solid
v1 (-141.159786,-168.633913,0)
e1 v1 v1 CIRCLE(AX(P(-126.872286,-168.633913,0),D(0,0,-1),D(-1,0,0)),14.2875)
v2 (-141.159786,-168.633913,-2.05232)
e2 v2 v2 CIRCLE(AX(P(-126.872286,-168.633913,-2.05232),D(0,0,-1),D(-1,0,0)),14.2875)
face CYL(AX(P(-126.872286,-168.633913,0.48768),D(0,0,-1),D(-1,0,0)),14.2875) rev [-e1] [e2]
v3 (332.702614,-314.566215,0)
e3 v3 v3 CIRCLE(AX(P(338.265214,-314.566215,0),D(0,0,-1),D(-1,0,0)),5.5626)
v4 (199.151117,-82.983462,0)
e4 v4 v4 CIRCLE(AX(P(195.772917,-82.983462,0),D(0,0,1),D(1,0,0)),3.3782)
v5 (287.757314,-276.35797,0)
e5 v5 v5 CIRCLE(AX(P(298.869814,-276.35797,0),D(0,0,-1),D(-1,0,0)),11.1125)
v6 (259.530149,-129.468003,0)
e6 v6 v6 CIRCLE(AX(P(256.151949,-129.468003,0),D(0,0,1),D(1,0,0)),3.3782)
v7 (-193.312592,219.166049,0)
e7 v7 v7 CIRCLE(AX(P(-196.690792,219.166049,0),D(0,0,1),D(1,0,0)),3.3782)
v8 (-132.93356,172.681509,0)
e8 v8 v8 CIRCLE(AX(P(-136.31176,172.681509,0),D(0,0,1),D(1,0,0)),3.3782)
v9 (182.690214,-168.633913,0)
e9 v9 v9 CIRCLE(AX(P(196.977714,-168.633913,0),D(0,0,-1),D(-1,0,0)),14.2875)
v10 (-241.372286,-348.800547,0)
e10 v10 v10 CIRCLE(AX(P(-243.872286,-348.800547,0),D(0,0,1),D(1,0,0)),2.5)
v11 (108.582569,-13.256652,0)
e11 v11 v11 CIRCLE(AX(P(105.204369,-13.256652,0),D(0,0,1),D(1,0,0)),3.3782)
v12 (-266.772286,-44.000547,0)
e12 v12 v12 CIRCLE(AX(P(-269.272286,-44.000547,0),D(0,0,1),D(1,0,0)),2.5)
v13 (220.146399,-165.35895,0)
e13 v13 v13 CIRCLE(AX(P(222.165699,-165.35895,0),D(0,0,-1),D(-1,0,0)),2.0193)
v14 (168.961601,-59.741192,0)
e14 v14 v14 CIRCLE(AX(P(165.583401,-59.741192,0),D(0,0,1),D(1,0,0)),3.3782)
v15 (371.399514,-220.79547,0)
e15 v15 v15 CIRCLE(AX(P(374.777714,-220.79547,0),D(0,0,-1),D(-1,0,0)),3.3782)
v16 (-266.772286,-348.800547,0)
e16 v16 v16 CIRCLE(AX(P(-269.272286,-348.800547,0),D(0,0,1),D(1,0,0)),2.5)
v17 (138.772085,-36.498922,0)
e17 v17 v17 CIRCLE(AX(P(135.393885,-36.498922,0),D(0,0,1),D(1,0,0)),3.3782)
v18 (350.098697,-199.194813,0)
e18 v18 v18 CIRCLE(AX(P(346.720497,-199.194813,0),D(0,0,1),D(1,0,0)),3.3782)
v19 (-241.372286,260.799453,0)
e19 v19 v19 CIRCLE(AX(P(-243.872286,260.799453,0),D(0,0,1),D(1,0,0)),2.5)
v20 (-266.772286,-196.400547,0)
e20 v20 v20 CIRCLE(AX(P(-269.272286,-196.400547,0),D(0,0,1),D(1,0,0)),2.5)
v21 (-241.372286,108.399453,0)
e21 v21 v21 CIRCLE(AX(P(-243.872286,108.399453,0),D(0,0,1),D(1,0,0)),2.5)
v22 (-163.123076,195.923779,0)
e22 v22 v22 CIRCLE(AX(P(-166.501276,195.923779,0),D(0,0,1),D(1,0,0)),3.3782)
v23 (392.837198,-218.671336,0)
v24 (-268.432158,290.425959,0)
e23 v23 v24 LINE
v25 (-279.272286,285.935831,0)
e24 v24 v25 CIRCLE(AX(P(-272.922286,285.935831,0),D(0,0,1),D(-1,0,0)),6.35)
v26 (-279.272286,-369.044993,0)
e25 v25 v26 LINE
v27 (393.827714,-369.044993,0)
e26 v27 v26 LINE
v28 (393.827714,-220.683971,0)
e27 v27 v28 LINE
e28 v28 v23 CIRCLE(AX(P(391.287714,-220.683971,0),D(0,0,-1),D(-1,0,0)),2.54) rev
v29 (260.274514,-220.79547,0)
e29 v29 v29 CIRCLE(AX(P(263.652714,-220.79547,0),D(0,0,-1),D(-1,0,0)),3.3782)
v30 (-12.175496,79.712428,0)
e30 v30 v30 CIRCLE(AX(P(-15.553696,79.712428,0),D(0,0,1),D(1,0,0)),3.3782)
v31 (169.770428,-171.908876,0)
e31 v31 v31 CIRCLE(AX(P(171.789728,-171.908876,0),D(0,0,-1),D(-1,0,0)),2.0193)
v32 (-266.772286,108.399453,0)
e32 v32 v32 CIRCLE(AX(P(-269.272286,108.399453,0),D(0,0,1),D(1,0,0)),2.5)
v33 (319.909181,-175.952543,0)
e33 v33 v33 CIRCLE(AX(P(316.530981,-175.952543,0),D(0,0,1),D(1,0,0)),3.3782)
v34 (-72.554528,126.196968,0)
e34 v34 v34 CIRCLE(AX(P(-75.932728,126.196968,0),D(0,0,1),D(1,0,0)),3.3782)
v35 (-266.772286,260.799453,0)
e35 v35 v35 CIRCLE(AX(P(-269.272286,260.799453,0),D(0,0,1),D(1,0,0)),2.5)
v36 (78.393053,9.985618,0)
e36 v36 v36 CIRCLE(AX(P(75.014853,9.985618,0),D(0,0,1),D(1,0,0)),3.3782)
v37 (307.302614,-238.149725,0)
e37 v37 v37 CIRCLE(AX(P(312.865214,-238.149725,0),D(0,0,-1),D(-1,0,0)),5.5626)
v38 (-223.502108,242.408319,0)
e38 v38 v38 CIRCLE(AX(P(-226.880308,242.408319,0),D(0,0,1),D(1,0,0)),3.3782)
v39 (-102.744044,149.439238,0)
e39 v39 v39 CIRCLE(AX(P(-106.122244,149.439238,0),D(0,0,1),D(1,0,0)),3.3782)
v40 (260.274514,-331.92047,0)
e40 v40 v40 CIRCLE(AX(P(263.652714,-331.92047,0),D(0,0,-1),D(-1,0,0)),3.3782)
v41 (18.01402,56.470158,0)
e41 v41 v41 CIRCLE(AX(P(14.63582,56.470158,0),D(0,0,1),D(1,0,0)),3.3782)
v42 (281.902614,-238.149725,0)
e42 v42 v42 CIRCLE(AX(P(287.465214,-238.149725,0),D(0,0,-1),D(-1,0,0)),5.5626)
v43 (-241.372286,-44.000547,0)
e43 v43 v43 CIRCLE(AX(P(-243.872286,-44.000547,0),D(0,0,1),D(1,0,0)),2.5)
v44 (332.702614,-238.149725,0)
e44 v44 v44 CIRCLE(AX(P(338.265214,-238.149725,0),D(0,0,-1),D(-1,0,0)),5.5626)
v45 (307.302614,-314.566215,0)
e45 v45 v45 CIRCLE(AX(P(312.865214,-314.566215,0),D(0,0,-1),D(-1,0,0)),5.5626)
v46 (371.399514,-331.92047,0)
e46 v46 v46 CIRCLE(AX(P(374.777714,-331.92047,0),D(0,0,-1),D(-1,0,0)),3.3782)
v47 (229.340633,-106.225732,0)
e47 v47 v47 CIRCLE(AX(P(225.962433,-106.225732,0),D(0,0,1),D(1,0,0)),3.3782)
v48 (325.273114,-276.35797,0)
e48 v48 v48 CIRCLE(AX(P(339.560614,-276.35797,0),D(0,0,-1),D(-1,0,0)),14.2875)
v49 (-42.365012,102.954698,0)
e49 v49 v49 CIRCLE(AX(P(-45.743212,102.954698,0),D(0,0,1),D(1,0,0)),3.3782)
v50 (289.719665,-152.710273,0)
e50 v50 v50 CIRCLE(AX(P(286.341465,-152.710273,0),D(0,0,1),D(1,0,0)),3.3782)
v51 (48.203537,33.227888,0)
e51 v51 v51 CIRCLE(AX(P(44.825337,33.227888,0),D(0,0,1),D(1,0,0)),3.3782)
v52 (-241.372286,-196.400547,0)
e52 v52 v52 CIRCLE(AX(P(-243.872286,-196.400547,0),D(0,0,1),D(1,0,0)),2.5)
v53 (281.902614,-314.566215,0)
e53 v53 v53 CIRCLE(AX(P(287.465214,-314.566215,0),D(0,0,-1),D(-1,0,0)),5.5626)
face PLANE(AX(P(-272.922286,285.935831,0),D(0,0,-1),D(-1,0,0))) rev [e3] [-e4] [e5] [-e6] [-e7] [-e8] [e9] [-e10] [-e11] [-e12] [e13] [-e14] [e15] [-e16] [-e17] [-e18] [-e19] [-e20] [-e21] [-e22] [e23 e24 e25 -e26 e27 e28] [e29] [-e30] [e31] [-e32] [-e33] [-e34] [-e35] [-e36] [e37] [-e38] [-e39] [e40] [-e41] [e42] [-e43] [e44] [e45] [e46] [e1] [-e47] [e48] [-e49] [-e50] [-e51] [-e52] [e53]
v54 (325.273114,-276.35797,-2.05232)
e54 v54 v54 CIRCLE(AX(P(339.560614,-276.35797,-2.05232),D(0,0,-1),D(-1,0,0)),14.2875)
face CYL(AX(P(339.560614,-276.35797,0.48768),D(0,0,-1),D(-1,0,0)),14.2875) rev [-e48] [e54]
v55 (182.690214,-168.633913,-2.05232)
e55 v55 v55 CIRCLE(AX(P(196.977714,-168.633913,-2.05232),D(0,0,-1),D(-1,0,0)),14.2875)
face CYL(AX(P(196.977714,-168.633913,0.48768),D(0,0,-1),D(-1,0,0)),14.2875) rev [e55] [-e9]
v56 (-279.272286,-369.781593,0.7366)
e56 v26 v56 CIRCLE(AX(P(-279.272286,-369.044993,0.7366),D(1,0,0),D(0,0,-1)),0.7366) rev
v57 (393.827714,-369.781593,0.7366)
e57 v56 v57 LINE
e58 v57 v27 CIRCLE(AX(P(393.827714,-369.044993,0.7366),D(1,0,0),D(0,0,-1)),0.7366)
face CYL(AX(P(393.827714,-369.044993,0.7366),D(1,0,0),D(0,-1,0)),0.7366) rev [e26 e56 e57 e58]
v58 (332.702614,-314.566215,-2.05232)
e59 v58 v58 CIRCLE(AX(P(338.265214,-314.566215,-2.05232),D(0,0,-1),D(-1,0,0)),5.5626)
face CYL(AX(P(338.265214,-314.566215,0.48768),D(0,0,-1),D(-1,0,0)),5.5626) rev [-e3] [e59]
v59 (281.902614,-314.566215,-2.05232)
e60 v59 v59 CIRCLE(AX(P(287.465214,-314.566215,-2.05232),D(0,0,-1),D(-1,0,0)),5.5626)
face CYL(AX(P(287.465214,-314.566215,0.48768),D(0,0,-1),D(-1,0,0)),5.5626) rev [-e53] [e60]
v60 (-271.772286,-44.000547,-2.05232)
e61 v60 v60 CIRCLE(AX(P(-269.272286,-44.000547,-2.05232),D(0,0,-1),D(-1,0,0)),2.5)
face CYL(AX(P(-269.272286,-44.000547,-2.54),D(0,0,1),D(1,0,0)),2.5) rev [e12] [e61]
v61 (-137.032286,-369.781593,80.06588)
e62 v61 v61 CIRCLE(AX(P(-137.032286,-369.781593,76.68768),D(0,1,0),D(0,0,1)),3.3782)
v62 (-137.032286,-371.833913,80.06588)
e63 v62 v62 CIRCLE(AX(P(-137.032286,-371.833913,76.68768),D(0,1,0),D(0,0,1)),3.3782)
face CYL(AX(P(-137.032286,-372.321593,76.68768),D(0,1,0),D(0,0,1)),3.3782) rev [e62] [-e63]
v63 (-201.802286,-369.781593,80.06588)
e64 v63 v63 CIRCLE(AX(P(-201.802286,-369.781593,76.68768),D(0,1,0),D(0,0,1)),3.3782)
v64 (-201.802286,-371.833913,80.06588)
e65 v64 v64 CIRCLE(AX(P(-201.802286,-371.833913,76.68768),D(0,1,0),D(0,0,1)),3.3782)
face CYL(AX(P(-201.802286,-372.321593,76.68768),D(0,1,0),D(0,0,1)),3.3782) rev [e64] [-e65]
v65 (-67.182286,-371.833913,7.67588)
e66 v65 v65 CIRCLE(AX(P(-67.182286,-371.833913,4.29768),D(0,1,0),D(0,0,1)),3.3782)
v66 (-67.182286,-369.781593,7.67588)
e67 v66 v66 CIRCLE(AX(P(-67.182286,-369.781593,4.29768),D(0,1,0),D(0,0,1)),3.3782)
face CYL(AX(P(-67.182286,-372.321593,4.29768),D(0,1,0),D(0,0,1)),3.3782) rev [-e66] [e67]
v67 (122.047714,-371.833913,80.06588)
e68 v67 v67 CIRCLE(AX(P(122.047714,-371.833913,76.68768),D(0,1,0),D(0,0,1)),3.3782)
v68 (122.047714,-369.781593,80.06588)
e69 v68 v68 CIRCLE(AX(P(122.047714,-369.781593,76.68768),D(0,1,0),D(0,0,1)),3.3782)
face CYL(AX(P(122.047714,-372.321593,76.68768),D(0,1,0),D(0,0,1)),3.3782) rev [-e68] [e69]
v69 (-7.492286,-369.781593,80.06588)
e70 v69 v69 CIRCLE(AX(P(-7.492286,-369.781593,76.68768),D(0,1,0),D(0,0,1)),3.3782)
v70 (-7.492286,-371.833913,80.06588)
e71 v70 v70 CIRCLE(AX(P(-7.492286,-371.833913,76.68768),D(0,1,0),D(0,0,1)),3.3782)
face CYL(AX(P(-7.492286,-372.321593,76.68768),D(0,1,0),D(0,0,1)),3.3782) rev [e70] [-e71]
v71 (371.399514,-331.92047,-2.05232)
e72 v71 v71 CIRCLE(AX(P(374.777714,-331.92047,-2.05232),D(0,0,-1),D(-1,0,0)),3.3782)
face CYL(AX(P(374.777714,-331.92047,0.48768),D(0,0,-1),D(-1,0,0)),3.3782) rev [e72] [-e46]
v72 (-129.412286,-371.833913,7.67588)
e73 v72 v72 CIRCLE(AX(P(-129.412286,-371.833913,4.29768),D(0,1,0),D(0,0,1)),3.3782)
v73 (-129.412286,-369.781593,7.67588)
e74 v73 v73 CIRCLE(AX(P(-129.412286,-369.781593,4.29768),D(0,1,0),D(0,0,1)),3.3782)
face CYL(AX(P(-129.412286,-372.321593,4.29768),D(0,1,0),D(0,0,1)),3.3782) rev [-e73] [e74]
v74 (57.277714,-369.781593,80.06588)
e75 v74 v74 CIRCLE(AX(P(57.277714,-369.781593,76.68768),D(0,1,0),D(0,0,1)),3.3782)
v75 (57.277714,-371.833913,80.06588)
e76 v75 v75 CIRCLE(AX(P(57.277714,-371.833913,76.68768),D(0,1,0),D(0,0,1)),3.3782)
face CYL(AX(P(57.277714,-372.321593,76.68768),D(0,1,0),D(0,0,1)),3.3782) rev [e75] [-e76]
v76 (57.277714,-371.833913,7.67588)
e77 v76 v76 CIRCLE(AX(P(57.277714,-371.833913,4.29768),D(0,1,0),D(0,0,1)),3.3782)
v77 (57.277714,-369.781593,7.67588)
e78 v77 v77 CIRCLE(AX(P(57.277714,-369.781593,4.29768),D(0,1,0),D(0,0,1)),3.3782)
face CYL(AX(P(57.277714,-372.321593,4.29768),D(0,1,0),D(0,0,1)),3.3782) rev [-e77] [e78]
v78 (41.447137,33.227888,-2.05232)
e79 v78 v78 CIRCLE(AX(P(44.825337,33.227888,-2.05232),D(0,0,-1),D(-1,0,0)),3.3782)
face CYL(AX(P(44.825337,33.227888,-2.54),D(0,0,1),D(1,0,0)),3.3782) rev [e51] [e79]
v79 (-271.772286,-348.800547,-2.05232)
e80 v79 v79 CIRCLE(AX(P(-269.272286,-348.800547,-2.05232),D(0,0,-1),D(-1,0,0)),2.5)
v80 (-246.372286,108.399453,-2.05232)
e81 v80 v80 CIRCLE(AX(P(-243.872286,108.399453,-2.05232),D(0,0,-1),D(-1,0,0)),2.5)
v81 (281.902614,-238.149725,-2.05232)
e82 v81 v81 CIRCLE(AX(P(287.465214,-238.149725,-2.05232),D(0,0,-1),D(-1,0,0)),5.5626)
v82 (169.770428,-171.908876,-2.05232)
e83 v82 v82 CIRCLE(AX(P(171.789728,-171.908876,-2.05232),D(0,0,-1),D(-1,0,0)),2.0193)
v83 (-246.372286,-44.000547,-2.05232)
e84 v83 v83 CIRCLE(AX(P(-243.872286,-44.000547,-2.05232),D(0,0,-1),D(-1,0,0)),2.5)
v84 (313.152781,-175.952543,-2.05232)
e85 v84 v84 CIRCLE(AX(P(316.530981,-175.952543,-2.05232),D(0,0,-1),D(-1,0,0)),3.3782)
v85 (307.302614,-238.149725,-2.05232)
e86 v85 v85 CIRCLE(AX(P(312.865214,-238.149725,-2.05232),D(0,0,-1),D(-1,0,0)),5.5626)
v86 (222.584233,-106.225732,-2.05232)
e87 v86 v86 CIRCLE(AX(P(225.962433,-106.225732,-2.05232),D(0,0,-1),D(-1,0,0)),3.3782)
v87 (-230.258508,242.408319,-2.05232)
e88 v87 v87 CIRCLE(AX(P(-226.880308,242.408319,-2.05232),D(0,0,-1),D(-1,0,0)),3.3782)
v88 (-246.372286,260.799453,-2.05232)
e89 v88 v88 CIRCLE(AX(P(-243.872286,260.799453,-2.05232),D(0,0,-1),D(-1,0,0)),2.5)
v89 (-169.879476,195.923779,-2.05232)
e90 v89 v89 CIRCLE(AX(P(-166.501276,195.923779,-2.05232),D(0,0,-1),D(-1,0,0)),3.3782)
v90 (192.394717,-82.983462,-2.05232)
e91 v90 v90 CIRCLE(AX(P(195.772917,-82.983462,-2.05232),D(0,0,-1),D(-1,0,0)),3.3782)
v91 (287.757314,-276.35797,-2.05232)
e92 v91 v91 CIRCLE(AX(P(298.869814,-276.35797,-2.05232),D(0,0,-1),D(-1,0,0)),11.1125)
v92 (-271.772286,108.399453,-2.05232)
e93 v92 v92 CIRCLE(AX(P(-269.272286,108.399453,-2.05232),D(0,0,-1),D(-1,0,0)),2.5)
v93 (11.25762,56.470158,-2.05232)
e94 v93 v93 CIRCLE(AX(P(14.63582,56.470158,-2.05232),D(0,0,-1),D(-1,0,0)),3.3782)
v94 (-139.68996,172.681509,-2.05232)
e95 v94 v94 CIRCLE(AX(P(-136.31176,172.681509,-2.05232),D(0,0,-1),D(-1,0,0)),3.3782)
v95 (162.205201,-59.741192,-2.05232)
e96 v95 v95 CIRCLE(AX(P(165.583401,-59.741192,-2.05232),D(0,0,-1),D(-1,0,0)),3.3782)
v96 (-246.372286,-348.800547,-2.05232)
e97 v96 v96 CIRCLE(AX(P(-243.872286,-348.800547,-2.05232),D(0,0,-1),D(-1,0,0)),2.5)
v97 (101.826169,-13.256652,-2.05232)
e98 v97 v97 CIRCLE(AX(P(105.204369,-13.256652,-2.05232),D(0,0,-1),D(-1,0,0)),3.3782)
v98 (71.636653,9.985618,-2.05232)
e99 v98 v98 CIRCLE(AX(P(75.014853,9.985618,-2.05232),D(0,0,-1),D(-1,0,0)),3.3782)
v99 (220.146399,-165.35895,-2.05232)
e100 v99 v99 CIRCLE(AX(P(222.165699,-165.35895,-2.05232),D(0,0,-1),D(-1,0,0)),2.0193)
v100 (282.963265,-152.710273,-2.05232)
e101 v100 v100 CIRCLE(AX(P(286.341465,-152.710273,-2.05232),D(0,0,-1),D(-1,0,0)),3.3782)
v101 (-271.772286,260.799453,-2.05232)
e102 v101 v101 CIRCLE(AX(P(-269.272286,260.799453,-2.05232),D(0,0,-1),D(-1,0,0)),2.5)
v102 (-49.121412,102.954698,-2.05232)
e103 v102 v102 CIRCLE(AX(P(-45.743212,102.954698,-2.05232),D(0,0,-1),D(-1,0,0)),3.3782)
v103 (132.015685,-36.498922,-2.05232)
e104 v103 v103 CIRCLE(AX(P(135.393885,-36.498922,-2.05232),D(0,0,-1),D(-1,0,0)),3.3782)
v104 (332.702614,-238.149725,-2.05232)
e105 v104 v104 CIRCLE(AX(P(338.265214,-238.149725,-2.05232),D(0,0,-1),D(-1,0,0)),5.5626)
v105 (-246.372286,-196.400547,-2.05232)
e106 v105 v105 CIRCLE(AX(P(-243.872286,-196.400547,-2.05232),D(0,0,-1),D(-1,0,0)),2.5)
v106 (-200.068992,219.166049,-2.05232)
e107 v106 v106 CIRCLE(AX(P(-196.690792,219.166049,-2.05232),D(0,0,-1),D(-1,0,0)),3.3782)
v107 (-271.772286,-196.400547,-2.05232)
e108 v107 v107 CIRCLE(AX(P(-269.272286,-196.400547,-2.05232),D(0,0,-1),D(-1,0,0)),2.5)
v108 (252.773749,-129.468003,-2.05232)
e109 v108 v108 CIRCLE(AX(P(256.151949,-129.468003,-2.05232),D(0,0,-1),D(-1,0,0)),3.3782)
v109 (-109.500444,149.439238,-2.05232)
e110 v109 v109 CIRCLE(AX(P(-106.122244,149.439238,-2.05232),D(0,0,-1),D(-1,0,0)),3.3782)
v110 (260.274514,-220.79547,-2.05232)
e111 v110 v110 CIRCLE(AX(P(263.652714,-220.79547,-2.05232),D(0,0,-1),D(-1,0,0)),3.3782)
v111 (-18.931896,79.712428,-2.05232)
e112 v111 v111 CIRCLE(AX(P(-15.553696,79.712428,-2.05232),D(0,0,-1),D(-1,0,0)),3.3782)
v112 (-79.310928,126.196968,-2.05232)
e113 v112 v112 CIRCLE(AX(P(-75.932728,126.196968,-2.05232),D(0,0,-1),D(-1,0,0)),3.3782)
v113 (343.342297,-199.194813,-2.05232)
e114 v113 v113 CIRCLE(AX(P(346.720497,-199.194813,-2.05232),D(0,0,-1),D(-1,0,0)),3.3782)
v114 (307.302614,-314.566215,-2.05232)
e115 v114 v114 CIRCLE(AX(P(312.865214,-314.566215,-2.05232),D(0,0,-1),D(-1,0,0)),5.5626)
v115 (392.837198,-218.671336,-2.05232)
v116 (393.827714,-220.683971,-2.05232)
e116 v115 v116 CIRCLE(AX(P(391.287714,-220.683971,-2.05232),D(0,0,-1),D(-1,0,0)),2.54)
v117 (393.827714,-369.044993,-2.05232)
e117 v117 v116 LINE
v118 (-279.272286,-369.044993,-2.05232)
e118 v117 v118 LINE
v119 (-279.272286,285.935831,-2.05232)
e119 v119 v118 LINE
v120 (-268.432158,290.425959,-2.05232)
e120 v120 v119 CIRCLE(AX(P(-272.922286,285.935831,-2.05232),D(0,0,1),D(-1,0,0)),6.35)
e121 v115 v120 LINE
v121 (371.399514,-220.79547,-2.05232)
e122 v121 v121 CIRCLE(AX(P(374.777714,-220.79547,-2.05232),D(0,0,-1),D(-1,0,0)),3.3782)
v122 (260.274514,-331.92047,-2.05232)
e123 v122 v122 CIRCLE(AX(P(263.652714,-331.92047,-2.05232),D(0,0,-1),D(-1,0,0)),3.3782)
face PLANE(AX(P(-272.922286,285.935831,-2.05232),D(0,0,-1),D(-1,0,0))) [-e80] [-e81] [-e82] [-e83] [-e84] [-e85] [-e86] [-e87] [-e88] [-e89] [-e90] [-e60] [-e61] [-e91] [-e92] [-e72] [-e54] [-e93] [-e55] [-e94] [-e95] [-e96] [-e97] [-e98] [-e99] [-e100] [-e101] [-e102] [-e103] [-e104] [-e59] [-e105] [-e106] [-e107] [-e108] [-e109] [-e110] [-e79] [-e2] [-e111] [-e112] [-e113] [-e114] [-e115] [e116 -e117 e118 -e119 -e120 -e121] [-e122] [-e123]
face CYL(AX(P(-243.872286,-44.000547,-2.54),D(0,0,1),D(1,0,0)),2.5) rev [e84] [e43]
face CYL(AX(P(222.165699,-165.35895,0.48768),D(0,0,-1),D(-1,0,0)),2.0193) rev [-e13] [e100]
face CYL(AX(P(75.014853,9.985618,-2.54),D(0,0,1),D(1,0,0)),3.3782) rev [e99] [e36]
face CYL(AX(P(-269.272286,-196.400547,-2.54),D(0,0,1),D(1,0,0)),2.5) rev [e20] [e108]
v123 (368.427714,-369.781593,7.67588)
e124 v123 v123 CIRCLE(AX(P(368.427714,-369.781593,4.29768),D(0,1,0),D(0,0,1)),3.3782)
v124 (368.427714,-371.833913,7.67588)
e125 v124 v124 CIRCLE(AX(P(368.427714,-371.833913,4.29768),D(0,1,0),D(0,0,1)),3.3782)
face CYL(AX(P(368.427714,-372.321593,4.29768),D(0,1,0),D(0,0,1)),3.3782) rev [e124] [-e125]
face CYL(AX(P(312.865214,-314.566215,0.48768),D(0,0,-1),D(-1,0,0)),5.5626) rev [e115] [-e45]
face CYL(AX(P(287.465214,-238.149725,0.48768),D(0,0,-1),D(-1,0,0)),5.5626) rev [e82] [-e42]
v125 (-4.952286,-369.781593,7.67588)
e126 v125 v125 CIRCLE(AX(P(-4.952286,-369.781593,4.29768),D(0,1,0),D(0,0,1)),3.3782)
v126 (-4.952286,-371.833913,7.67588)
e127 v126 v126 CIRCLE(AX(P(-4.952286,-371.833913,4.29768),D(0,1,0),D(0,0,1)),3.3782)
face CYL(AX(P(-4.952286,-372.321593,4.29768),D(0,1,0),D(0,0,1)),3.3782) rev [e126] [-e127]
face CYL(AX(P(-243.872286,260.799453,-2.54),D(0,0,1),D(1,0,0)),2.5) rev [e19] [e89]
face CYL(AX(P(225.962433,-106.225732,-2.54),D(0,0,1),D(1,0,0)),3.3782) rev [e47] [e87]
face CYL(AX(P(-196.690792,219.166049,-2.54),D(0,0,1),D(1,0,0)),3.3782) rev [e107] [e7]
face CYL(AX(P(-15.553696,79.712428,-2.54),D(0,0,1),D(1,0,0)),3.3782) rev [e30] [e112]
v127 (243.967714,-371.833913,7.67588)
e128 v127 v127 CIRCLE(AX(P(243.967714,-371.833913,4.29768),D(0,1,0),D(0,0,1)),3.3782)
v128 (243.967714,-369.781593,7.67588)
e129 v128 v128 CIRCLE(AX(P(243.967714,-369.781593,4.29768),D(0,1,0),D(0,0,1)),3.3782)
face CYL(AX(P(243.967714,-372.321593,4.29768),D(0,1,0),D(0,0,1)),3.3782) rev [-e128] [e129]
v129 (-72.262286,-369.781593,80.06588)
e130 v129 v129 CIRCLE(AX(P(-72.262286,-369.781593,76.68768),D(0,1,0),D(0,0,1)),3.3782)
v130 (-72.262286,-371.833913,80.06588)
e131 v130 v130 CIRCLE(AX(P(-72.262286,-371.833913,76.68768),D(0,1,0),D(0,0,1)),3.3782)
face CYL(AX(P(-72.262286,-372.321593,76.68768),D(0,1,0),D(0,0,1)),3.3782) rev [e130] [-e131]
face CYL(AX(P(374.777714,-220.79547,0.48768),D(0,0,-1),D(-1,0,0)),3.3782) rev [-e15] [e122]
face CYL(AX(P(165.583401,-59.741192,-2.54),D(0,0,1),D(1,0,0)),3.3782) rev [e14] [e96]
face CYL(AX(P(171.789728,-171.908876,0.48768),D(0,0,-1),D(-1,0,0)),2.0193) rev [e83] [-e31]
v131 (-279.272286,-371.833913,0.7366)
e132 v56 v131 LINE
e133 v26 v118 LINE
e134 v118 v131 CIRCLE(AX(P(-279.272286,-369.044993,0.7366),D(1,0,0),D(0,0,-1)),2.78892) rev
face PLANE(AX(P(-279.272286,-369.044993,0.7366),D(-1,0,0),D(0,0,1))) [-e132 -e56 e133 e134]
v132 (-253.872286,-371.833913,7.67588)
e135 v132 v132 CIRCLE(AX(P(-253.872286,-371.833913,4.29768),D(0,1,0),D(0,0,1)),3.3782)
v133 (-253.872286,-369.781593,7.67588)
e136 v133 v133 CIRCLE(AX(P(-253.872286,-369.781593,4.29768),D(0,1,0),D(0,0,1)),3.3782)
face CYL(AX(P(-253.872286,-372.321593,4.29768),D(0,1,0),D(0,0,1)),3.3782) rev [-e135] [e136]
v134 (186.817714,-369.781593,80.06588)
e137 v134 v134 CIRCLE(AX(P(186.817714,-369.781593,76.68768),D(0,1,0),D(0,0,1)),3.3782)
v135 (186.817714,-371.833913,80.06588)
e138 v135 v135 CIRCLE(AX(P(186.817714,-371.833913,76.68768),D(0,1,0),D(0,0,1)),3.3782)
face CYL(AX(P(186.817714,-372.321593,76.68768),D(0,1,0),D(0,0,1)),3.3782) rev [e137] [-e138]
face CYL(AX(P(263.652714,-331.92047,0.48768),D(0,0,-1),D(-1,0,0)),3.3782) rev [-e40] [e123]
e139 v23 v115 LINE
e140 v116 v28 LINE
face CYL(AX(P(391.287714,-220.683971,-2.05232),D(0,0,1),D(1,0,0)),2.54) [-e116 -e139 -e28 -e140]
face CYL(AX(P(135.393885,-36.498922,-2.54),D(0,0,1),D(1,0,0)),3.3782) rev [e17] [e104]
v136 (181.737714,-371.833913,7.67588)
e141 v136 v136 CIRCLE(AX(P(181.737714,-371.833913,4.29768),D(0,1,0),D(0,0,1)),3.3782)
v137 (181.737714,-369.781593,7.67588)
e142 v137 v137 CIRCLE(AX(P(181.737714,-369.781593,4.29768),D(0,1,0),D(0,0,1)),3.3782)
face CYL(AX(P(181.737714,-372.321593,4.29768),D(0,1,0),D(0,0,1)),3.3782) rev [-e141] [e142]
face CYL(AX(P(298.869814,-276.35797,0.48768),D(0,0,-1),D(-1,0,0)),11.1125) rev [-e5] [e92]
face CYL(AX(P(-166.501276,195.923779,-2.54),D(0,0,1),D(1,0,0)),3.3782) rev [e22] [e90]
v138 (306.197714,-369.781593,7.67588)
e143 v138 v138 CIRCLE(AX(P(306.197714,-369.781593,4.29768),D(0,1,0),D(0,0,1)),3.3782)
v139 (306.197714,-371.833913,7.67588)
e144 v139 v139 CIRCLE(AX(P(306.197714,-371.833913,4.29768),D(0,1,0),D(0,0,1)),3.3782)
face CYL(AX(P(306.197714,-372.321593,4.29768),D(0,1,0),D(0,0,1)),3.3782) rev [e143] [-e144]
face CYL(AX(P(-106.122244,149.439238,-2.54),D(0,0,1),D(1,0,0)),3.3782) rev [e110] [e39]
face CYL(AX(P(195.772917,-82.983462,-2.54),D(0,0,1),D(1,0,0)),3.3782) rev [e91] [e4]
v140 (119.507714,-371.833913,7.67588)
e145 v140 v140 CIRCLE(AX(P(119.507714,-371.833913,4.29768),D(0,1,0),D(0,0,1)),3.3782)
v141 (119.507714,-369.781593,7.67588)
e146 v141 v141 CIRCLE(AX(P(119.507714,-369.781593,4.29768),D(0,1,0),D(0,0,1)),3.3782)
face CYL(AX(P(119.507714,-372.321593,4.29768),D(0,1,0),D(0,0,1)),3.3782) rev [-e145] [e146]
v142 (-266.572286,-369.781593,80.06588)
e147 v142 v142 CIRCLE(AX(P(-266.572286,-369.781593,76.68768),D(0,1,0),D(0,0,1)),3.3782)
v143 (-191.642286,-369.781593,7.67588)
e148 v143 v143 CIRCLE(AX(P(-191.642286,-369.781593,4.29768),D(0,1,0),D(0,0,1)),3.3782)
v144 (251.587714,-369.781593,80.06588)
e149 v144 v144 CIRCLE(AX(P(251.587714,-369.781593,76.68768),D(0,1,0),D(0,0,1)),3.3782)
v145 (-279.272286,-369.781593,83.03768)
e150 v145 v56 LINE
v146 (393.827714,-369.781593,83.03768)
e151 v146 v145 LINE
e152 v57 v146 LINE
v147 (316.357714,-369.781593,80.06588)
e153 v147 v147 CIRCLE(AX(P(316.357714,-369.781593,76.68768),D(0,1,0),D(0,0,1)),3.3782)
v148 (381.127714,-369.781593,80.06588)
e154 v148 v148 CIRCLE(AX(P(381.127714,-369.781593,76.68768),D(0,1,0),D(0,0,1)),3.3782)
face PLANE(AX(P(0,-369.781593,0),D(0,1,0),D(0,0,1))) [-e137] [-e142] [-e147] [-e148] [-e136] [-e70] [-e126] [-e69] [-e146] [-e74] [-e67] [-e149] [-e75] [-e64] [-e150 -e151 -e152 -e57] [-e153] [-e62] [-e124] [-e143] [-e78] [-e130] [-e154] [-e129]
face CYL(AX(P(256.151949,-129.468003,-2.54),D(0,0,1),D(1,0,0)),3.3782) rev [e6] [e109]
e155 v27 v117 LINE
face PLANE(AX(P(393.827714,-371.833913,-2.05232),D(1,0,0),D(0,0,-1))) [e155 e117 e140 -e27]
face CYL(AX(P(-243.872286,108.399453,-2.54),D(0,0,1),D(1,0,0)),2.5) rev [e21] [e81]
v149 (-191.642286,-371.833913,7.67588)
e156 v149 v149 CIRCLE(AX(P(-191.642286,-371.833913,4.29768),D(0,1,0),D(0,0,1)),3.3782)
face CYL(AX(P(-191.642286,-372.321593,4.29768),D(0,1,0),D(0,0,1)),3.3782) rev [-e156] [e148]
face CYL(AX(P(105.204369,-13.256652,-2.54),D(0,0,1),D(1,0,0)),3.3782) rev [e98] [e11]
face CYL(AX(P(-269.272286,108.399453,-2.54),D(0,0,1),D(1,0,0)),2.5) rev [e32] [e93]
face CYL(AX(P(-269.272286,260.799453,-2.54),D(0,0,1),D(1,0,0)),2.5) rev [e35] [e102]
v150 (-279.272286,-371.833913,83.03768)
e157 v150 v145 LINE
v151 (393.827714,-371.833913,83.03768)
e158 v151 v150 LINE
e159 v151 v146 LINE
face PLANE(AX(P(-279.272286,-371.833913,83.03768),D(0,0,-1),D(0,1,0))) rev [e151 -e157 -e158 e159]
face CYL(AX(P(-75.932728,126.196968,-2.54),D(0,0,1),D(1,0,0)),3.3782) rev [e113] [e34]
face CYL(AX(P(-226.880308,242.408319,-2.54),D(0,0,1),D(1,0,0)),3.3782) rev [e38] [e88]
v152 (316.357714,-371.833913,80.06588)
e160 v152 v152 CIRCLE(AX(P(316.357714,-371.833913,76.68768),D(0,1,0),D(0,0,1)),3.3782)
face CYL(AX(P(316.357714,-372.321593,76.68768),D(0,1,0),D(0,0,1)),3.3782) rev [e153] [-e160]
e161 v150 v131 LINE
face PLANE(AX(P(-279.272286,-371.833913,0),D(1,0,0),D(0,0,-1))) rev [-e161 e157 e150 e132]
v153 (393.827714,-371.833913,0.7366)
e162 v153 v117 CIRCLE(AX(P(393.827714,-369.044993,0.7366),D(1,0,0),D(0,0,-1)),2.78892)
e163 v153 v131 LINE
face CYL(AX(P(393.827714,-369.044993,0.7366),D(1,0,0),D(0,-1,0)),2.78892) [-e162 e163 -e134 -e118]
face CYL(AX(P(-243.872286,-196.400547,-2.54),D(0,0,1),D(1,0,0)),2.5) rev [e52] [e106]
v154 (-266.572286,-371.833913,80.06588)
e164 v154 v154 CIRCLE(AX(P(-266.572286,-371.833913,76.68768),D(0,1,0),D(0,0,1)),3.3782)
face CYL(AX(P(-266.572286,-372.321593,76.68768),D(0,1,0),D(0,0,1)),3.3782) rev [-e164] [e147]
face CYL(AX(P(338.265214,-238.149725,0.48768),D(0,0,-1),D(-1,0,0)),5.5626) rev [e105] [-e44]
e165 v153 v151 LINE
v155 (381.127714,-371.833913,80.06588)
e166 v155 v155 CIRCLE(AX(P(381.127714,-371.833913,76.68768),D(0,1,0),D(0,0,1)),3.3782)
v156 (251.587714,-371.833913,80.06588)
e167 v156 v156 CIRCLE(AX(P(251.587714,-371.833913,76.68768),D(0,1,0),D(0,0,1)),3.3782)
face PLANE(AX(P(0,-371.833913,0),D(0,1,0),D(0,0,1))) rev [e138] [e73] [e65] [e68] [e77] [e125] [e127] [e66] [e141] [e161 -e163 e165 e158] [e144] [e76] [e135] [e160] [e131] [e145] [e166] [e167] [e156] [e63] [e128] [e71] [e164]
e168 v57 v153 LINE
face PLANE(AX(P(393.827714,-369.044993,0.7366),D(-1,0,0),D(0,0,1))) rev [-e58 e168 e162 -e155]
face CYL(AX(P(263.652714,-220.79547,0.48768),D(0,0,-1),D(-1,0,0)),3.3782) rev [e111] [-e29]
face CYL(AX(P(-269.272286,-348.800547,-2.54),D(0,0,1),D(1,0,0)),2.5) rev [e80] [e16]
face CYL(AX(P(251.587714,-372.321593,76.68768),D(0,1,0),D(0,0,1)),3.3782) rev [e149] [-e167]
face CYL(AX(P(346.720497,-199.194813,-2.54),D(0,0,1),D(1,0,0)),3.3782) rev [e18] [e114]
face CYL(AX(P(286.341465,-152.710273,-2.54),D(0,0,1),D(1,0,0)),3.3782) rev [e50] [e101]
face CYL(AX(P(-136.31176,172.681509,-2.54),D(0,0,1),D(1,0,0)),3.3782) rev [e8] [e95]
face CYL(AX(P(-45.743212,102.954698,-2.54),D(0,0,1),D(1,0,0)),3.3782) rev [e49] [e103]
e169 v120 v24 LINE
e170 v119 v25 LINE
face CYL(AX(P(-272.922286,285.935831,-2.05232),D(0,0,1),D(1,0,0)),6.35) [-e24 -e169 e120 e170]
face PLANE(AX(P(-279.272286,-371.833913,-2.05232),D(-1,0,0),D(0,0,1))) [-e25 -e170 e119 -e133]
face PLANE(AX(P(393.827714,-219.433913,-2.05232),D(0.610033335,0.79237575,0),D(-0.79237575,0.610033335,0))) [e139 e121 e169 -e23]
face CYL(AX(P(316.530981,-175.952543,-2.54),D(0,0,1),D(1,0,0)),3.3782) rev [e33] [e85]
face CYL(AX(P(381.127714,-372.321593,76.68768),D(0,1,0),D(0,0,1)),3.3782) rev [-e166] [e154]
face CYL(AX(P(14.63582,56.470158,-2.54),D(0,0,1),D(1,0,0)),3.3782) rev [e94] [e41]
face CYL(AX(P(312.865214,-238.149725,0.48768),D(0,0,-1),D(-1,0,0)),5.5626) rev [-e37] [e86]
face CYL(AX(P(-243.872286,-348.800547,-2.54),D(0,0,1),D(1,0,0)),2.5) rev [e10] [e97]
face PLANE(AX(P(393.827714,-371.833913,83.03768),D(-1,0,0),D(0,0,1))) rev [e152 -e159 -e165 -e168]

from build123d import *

# Parameters (mm, degrees)
BASE_FLANGE1_DEPTH           = 2.05232
EDGE_FLANGE1_STRIP_W         = 9.68248
EDGE_FLANGE1_STRIP_H         = 2.05232
EDGE_FLANGE1_STRIP_CUT_DEPTH = 673.1
EDGE_FLANGE1_DEPTH           = 673.1
SKETCH9_R                    = 3.3782
CUT_EXTRUDE1_DEPTH           = 2.54
SKETCH11_R                   = 2.5
CUT_EXTRUDE2_DEPTH           = 2.54
SKETCH12_R                   = 3.3782
SKETCH12_R_2                 = 14.2875
SKETCH12_R_3                 = 2.0193
CUT_EXTRUDE3_DEPTH           = 2.54
FILLET1_R                    = 2.54
SKETCH13_R                   = 5.5626
SKETCH13_R_2                 = 11.1125
SKETCH13_R_3                 = 14.2875
CUT_EXTRUDE4_DEPTH           = 2.54
SKETCH14_R                   = 3.3782
CUT_EXTRUDE5_DEPTH           = 2.54


# Sheet-metal steps are written as plain solids
with BuildPart() as part:
    # Sketch1 → Base-Flange1 (new body)
    with BuildSketch(Plane.XY):
        with BuildLine():
            Line((-279.272286306, -371.833913043), (-279.272286306, 285.935830835))
            ThreePointArc((-279.272286306, 285.935830835), (-275.352326101, 291.802465867), (-268.432158245, 290.425958896))
            Line((-268.432158245, 290.425958896), (393.827713694, -219.433913043))
            Line((393.827713694, -219.433913043), (393.827713694, -371.833913043))
            Line((393.827713694, -371.833913043), (-279.272286306, -371.833913043))
        make_face()
    extrude(amount=-BASE_FLANGE1_DEPTH)

    # Edge-Flange1 strip (across the edge) → Edge-Flange1 strip cut (cut)
    with BuildSketch(Plane(origin=(-279.272286306, -371.833913043, 0), x_dir=(0, 1, 0), z_dir=(1, 0, 0))):
        with Locations((-2.05232, -1.02616)):
            Rectangle(EDGE_FLANGE1_STRIP_W, EDGE_FLANGE1_STRIP_H)
    extrude(amount=EDGE_FLANGE1_STRIP_CUT_DEPTH, mode=Mode.SUBTRACT)

    # Edge-Flange1 section (across the edge) → Edge-Flange1 (add)
    with BuildSketch(Plane(origin=(-279.272286306, -371.833913043, 0), x_dir=(0, 1, 0), z_dir=(1, 0, 0))):
        with BuildLine():
            Line((0, 0.7366), (0, 83.03768))
            Line((0, 83.03768), (2.05232, 83.03768))
            Line((2.05232, 83.03768), (2.05232, 0.7366))
            ThreePointArc((2.05232, 0.7366), (2.268065145, 0.215745145), (2.78892, 0))
            Line((2.78892, 0), (2.78892, -2.05232))
            ThreePointArc((2.78892, -2.05232), (0.816855756, -1.235464244), (0, 0.7366))
        make_face()
    extrude(amount=EDGE_FLANGE1_DEPTH)

    # Sketch9 → Cut-Extrude1 (cut)
    with BuildSketch(Plane(origin=(0, -369.781593043, 0), x_dir=(1, 0, 0), z_dir=(0, 1, 0))):
        with Locations(Location((381.127713694, -76.68768, 0), (0, 0, 270))):
            Circle(SKETCH9_R)
        with Locations(Location((316.357713694, -76.68768, 0), (0, 0, 270))):
            Circle(SKETCH9_R)
        with Locations(Location((251.587713694, -76.68768, 0), (0, 0, 270))):
            Circle(SKETCH9_R)
        with Locations(Location((186.817713694, -76.68768, 0), (0, 0, 270))):
            Circle(SKETCH9_R)
        with Locations(Location((122.047713694, -76.68768, 0), (0, 0, 270))):
            Circle(SKETCH9_R)
        with Locations(Location((57.277713694, -76.68768, 0), (0, 0, 270))):
            Circle(SKETCH9_R)
        with Locations(Location((-7.492286306, -76.68768, 0), (0, 0, 270))):
            Circle(SKETCH9_R)
        with Locations(Location((-72.262286306, -76.68768, 0), (0, 0, 270))):
            Circle(SKETCH9_R)
        with Locations(Location((-137.032286306, -76.68768, 0), (0, 0, 270))):
            Circle(SKETCH9_R)
        with Locations(Location((-201.802286306, -76.68768, 0), (0, 0, 270))):
            Circle(SKETCH9_R)
        with Locations(Location((-266.572286306, -76.68768, 0), (0, 0, 270))):
            Circle(SKETCH9_R)
        with Locations(Location((368.427713694, -4.29768, 0), (0, 0, 270))):
            Circle(SKETCH9_R)
        with Locations(Location((306.197713694, -4.29768, 0), (0, 0, 270))):
            Circle(SKETCH9_R)
        with Locations(Location((243.967713694, -4.29768, 0), (0, 0, 270))):
            Circle(SKETCH9_R)
        with Locations(Location((181.737713694, -4.29768, 0), (0, 0, 270))):
            Circle(SKETCH9_R)
        with Locations(Location((119.507713694, -4.29768, 0), (0, 0, 270))):
            Circle(SKETCH9_R)
        with Locations(Location((57.277713694, -4.29768, 0), (0, 0, 270))):
            Circle(SKETCH9_R)
        with Locations(Location((-4.952286306, -4.29768, 0), (0, 0, 270))):
            Circle(SKETCH9_R)
        with Locations(Location((-67.182286306, -4.29768, 0), (0, 0, 270))):
            Circle(SKETCH9_R)
        with Locations(Location((-129.412286306, -4.29768, 0), (0, 0, 270))):
            Circle(SKETCH9_R)
        with Locations(Location((-191.642286306, -4.29768, 0), (0, 0, 270))):
            Circle(SKETCH9_R)
        with Locations(Location((-253.872286306, -4.29768, 0), (0, 0, 270))):
            Circle(SKETCH9_R)
    extrude(amount=-CUT_EXTRUDE1_DEPTH, mode=Mode.SUBTRACT)

    # Sketch11 → Cut-Extrude2 (cut)
    with BuildSketch(Plane.XY):
        with Locations((-269.272286306, 260.799452815)):
            Circle(SKETCH11_R)
        with Locations((-269.272286306, 108.399452815)):
            Circle(SKETCH11_R)
        with Locations((-269.272286306, -44.000547185)):
            Circle(SKETCH11_R)
        with Locations((-269.272286306, -196.400547185)):
            Circle(SKETCH11_R)
        with Locations((-269.272286306, -348.800547185)):
            Circle(SKETCH11_R)
        with Locations((-243.872286306, 260.799452815)):
            Circle(SKETCH11_R)
        with Locations((-243.872286306, 108.399452815)):
            Circle(SKETCH11_R)
        with Locations((-243.872286306, -44.000547185)):
            Circle(SKETCH11_R)
        with Locations((-243.872286306, -196.400547185)):
            Circle(SKETCH11_R)
        with Locations((-243.872286306, -348.800547185)):
            Circle(SKETCH11_R)
    extrude(amount=-CUT_EXTRUDE2_DEPTH, mode=Mode.SUBTRACT)

    # Sketch12 → Cut-Extrude3 (cut)
    with BuildSketch(Plane(origin=(0, 0, -2.05232), x_dir=(-1, 0, 0), z_dir=(0, 0, -1))):
        with Locations((-374.777713694, -220.79547031)):
            Circle(SKETCH12_R)
        with Locations((-374.777713694, -331.92047031)):
            Circle(SKETCH12_R)
        with Locations((-263.652713694, -331.92047031)):
            Circle(SKETCH12_R)
        with Locations((-263.652713694, -220.79547031)):
            Circle(SKETCH12_R)
        with Locations((-196.977713694, -168.633913043)):
            Circle(SKETCH12_R_2)
        with Locations((126.872286306, -168.633913043)):
            Circle(SKETCH12_R_2)
        with Locations((-222.165699247, -165.358949868)):
            Circle(SKETCH12_R_3)
        with Locations((-171.789728141, -171.908876219)):
            Circle(SKETCH12_R_3)
    extrude(amount=-CUT_EXTRUDE3_DEPTH, mode=Mode.SUBTRACT)

    # Fillet1
    fillet1_edges = [part.edges().sort_by_distance(p)[0] for p in [
        (393.827713694, -219.433913043, -1.02616),
    ]]
    fillet(fillet1_edges, radius=FILLET1_R)

    # Sketch13 → Cut-Extrude4 (cut)
    with BuildSketch(Plane(origin=(0, 0, -2.05232), x_dir=(-1, 0, 0), z_dir=(0, 0, -1))):
        with Locations((-287.465213694, -314.566215277)):
            Circle(SKETCH13_R)
        with Locations((-312.865213694, -314.566215277)):
            Circle(SKETCH13_R)
        with Locations((-338.265213694, -314.566215277)):
            Circle(SKETCH13_R)
        with Locations((-298.869813694, -276.35797031)):
            Circle(SKETCH13_R_2)
        with Locations((-339.560613694, -276.35797031)):
            Circle(SKETCH13_R_3)
        with Locations((-287.465213694, -238.149725343)):
            Circle(SKETCH13_R)
        with Locations((-312.865213694, -238.149725343)):
            Circle(SKETCH13_R)
        with Locations((-338.265213694, -238.149725343)):
            Circle(SKETCH13_R)
    extrude(amount=-CUT_EXTRUDE4_DEPTH, mode=Mode.SUBTRACT)

    # Sketch14 → Cut-Extrude5 (cut)
    with BuildSketch(Plane.XY):
        with Locations((-226.880308275, 242.408318762)):
            Circle(SKETCH14_R)
        with Locations((-196.690792188, 219.166048683)):
            Circle(SKETCH14_R)
        with Locations((-166.501276101, 195.923778604)):
            Circle(SKETCH14_R)
        with Locations((-136.311760014, 172.681508525)):
            Circle(SKETCH14_R)
        with Locations((-106.122243926, 149.439238446)):
            Circle(SKETCH14_R)
        with Locations((-75.932727839, 126.196968367)):
            Circle(SKETCH14_R)
        with Locations((-45.743211752, 102.954698288)):
            Circle(SKETCH14_R)
        with Locations((-15.553695665, 79.712428209)):
            Circle(SKETCH14_R)
        with Locations((14.635820422, 56.47015813)):
            Circle(SKETCH14_R)
        with Locations((44.825336509, 33.227888051)):
            Circle(SKETCH14_R)
        with Locations((75.014852596, 9.985617972)):
            Circle(SKETCH14_R)
        with Locations((105.204368683, -13.256652107)):
            Circle(SKETCH14_R)
        with Locations((135.393884771, -36.498922186)):
            Circle(SKETCH14_R)
        with Locations((165.583400858, -59.741192265)):
            Circle(SKETCH14_R)
        with Locations((195.772916945, -82.983462344)):
            Circle(SKETCH14_R)
        with Locations((225.962433032, -106.225732423)):
            Circle(SKETCH14_R)
        with Locations((256.151949119, -129.468002502)):
            Circle(SKETCH14_R)
        with Locations((286.341465206, -152.710272581)):
            Circle(SKETCH14_R)
        with Locations((316.530981293, -175.95254266)):
            Circle(SKETCH14_R)
        with Locations((346.720497381, -199.194812739)):
            Circle(SKETCH14_R)
    extrude(amount=-CUT_EXTRUDE5_DEPTH, mode=Mode.SUBTRACT)


solid = part.part
